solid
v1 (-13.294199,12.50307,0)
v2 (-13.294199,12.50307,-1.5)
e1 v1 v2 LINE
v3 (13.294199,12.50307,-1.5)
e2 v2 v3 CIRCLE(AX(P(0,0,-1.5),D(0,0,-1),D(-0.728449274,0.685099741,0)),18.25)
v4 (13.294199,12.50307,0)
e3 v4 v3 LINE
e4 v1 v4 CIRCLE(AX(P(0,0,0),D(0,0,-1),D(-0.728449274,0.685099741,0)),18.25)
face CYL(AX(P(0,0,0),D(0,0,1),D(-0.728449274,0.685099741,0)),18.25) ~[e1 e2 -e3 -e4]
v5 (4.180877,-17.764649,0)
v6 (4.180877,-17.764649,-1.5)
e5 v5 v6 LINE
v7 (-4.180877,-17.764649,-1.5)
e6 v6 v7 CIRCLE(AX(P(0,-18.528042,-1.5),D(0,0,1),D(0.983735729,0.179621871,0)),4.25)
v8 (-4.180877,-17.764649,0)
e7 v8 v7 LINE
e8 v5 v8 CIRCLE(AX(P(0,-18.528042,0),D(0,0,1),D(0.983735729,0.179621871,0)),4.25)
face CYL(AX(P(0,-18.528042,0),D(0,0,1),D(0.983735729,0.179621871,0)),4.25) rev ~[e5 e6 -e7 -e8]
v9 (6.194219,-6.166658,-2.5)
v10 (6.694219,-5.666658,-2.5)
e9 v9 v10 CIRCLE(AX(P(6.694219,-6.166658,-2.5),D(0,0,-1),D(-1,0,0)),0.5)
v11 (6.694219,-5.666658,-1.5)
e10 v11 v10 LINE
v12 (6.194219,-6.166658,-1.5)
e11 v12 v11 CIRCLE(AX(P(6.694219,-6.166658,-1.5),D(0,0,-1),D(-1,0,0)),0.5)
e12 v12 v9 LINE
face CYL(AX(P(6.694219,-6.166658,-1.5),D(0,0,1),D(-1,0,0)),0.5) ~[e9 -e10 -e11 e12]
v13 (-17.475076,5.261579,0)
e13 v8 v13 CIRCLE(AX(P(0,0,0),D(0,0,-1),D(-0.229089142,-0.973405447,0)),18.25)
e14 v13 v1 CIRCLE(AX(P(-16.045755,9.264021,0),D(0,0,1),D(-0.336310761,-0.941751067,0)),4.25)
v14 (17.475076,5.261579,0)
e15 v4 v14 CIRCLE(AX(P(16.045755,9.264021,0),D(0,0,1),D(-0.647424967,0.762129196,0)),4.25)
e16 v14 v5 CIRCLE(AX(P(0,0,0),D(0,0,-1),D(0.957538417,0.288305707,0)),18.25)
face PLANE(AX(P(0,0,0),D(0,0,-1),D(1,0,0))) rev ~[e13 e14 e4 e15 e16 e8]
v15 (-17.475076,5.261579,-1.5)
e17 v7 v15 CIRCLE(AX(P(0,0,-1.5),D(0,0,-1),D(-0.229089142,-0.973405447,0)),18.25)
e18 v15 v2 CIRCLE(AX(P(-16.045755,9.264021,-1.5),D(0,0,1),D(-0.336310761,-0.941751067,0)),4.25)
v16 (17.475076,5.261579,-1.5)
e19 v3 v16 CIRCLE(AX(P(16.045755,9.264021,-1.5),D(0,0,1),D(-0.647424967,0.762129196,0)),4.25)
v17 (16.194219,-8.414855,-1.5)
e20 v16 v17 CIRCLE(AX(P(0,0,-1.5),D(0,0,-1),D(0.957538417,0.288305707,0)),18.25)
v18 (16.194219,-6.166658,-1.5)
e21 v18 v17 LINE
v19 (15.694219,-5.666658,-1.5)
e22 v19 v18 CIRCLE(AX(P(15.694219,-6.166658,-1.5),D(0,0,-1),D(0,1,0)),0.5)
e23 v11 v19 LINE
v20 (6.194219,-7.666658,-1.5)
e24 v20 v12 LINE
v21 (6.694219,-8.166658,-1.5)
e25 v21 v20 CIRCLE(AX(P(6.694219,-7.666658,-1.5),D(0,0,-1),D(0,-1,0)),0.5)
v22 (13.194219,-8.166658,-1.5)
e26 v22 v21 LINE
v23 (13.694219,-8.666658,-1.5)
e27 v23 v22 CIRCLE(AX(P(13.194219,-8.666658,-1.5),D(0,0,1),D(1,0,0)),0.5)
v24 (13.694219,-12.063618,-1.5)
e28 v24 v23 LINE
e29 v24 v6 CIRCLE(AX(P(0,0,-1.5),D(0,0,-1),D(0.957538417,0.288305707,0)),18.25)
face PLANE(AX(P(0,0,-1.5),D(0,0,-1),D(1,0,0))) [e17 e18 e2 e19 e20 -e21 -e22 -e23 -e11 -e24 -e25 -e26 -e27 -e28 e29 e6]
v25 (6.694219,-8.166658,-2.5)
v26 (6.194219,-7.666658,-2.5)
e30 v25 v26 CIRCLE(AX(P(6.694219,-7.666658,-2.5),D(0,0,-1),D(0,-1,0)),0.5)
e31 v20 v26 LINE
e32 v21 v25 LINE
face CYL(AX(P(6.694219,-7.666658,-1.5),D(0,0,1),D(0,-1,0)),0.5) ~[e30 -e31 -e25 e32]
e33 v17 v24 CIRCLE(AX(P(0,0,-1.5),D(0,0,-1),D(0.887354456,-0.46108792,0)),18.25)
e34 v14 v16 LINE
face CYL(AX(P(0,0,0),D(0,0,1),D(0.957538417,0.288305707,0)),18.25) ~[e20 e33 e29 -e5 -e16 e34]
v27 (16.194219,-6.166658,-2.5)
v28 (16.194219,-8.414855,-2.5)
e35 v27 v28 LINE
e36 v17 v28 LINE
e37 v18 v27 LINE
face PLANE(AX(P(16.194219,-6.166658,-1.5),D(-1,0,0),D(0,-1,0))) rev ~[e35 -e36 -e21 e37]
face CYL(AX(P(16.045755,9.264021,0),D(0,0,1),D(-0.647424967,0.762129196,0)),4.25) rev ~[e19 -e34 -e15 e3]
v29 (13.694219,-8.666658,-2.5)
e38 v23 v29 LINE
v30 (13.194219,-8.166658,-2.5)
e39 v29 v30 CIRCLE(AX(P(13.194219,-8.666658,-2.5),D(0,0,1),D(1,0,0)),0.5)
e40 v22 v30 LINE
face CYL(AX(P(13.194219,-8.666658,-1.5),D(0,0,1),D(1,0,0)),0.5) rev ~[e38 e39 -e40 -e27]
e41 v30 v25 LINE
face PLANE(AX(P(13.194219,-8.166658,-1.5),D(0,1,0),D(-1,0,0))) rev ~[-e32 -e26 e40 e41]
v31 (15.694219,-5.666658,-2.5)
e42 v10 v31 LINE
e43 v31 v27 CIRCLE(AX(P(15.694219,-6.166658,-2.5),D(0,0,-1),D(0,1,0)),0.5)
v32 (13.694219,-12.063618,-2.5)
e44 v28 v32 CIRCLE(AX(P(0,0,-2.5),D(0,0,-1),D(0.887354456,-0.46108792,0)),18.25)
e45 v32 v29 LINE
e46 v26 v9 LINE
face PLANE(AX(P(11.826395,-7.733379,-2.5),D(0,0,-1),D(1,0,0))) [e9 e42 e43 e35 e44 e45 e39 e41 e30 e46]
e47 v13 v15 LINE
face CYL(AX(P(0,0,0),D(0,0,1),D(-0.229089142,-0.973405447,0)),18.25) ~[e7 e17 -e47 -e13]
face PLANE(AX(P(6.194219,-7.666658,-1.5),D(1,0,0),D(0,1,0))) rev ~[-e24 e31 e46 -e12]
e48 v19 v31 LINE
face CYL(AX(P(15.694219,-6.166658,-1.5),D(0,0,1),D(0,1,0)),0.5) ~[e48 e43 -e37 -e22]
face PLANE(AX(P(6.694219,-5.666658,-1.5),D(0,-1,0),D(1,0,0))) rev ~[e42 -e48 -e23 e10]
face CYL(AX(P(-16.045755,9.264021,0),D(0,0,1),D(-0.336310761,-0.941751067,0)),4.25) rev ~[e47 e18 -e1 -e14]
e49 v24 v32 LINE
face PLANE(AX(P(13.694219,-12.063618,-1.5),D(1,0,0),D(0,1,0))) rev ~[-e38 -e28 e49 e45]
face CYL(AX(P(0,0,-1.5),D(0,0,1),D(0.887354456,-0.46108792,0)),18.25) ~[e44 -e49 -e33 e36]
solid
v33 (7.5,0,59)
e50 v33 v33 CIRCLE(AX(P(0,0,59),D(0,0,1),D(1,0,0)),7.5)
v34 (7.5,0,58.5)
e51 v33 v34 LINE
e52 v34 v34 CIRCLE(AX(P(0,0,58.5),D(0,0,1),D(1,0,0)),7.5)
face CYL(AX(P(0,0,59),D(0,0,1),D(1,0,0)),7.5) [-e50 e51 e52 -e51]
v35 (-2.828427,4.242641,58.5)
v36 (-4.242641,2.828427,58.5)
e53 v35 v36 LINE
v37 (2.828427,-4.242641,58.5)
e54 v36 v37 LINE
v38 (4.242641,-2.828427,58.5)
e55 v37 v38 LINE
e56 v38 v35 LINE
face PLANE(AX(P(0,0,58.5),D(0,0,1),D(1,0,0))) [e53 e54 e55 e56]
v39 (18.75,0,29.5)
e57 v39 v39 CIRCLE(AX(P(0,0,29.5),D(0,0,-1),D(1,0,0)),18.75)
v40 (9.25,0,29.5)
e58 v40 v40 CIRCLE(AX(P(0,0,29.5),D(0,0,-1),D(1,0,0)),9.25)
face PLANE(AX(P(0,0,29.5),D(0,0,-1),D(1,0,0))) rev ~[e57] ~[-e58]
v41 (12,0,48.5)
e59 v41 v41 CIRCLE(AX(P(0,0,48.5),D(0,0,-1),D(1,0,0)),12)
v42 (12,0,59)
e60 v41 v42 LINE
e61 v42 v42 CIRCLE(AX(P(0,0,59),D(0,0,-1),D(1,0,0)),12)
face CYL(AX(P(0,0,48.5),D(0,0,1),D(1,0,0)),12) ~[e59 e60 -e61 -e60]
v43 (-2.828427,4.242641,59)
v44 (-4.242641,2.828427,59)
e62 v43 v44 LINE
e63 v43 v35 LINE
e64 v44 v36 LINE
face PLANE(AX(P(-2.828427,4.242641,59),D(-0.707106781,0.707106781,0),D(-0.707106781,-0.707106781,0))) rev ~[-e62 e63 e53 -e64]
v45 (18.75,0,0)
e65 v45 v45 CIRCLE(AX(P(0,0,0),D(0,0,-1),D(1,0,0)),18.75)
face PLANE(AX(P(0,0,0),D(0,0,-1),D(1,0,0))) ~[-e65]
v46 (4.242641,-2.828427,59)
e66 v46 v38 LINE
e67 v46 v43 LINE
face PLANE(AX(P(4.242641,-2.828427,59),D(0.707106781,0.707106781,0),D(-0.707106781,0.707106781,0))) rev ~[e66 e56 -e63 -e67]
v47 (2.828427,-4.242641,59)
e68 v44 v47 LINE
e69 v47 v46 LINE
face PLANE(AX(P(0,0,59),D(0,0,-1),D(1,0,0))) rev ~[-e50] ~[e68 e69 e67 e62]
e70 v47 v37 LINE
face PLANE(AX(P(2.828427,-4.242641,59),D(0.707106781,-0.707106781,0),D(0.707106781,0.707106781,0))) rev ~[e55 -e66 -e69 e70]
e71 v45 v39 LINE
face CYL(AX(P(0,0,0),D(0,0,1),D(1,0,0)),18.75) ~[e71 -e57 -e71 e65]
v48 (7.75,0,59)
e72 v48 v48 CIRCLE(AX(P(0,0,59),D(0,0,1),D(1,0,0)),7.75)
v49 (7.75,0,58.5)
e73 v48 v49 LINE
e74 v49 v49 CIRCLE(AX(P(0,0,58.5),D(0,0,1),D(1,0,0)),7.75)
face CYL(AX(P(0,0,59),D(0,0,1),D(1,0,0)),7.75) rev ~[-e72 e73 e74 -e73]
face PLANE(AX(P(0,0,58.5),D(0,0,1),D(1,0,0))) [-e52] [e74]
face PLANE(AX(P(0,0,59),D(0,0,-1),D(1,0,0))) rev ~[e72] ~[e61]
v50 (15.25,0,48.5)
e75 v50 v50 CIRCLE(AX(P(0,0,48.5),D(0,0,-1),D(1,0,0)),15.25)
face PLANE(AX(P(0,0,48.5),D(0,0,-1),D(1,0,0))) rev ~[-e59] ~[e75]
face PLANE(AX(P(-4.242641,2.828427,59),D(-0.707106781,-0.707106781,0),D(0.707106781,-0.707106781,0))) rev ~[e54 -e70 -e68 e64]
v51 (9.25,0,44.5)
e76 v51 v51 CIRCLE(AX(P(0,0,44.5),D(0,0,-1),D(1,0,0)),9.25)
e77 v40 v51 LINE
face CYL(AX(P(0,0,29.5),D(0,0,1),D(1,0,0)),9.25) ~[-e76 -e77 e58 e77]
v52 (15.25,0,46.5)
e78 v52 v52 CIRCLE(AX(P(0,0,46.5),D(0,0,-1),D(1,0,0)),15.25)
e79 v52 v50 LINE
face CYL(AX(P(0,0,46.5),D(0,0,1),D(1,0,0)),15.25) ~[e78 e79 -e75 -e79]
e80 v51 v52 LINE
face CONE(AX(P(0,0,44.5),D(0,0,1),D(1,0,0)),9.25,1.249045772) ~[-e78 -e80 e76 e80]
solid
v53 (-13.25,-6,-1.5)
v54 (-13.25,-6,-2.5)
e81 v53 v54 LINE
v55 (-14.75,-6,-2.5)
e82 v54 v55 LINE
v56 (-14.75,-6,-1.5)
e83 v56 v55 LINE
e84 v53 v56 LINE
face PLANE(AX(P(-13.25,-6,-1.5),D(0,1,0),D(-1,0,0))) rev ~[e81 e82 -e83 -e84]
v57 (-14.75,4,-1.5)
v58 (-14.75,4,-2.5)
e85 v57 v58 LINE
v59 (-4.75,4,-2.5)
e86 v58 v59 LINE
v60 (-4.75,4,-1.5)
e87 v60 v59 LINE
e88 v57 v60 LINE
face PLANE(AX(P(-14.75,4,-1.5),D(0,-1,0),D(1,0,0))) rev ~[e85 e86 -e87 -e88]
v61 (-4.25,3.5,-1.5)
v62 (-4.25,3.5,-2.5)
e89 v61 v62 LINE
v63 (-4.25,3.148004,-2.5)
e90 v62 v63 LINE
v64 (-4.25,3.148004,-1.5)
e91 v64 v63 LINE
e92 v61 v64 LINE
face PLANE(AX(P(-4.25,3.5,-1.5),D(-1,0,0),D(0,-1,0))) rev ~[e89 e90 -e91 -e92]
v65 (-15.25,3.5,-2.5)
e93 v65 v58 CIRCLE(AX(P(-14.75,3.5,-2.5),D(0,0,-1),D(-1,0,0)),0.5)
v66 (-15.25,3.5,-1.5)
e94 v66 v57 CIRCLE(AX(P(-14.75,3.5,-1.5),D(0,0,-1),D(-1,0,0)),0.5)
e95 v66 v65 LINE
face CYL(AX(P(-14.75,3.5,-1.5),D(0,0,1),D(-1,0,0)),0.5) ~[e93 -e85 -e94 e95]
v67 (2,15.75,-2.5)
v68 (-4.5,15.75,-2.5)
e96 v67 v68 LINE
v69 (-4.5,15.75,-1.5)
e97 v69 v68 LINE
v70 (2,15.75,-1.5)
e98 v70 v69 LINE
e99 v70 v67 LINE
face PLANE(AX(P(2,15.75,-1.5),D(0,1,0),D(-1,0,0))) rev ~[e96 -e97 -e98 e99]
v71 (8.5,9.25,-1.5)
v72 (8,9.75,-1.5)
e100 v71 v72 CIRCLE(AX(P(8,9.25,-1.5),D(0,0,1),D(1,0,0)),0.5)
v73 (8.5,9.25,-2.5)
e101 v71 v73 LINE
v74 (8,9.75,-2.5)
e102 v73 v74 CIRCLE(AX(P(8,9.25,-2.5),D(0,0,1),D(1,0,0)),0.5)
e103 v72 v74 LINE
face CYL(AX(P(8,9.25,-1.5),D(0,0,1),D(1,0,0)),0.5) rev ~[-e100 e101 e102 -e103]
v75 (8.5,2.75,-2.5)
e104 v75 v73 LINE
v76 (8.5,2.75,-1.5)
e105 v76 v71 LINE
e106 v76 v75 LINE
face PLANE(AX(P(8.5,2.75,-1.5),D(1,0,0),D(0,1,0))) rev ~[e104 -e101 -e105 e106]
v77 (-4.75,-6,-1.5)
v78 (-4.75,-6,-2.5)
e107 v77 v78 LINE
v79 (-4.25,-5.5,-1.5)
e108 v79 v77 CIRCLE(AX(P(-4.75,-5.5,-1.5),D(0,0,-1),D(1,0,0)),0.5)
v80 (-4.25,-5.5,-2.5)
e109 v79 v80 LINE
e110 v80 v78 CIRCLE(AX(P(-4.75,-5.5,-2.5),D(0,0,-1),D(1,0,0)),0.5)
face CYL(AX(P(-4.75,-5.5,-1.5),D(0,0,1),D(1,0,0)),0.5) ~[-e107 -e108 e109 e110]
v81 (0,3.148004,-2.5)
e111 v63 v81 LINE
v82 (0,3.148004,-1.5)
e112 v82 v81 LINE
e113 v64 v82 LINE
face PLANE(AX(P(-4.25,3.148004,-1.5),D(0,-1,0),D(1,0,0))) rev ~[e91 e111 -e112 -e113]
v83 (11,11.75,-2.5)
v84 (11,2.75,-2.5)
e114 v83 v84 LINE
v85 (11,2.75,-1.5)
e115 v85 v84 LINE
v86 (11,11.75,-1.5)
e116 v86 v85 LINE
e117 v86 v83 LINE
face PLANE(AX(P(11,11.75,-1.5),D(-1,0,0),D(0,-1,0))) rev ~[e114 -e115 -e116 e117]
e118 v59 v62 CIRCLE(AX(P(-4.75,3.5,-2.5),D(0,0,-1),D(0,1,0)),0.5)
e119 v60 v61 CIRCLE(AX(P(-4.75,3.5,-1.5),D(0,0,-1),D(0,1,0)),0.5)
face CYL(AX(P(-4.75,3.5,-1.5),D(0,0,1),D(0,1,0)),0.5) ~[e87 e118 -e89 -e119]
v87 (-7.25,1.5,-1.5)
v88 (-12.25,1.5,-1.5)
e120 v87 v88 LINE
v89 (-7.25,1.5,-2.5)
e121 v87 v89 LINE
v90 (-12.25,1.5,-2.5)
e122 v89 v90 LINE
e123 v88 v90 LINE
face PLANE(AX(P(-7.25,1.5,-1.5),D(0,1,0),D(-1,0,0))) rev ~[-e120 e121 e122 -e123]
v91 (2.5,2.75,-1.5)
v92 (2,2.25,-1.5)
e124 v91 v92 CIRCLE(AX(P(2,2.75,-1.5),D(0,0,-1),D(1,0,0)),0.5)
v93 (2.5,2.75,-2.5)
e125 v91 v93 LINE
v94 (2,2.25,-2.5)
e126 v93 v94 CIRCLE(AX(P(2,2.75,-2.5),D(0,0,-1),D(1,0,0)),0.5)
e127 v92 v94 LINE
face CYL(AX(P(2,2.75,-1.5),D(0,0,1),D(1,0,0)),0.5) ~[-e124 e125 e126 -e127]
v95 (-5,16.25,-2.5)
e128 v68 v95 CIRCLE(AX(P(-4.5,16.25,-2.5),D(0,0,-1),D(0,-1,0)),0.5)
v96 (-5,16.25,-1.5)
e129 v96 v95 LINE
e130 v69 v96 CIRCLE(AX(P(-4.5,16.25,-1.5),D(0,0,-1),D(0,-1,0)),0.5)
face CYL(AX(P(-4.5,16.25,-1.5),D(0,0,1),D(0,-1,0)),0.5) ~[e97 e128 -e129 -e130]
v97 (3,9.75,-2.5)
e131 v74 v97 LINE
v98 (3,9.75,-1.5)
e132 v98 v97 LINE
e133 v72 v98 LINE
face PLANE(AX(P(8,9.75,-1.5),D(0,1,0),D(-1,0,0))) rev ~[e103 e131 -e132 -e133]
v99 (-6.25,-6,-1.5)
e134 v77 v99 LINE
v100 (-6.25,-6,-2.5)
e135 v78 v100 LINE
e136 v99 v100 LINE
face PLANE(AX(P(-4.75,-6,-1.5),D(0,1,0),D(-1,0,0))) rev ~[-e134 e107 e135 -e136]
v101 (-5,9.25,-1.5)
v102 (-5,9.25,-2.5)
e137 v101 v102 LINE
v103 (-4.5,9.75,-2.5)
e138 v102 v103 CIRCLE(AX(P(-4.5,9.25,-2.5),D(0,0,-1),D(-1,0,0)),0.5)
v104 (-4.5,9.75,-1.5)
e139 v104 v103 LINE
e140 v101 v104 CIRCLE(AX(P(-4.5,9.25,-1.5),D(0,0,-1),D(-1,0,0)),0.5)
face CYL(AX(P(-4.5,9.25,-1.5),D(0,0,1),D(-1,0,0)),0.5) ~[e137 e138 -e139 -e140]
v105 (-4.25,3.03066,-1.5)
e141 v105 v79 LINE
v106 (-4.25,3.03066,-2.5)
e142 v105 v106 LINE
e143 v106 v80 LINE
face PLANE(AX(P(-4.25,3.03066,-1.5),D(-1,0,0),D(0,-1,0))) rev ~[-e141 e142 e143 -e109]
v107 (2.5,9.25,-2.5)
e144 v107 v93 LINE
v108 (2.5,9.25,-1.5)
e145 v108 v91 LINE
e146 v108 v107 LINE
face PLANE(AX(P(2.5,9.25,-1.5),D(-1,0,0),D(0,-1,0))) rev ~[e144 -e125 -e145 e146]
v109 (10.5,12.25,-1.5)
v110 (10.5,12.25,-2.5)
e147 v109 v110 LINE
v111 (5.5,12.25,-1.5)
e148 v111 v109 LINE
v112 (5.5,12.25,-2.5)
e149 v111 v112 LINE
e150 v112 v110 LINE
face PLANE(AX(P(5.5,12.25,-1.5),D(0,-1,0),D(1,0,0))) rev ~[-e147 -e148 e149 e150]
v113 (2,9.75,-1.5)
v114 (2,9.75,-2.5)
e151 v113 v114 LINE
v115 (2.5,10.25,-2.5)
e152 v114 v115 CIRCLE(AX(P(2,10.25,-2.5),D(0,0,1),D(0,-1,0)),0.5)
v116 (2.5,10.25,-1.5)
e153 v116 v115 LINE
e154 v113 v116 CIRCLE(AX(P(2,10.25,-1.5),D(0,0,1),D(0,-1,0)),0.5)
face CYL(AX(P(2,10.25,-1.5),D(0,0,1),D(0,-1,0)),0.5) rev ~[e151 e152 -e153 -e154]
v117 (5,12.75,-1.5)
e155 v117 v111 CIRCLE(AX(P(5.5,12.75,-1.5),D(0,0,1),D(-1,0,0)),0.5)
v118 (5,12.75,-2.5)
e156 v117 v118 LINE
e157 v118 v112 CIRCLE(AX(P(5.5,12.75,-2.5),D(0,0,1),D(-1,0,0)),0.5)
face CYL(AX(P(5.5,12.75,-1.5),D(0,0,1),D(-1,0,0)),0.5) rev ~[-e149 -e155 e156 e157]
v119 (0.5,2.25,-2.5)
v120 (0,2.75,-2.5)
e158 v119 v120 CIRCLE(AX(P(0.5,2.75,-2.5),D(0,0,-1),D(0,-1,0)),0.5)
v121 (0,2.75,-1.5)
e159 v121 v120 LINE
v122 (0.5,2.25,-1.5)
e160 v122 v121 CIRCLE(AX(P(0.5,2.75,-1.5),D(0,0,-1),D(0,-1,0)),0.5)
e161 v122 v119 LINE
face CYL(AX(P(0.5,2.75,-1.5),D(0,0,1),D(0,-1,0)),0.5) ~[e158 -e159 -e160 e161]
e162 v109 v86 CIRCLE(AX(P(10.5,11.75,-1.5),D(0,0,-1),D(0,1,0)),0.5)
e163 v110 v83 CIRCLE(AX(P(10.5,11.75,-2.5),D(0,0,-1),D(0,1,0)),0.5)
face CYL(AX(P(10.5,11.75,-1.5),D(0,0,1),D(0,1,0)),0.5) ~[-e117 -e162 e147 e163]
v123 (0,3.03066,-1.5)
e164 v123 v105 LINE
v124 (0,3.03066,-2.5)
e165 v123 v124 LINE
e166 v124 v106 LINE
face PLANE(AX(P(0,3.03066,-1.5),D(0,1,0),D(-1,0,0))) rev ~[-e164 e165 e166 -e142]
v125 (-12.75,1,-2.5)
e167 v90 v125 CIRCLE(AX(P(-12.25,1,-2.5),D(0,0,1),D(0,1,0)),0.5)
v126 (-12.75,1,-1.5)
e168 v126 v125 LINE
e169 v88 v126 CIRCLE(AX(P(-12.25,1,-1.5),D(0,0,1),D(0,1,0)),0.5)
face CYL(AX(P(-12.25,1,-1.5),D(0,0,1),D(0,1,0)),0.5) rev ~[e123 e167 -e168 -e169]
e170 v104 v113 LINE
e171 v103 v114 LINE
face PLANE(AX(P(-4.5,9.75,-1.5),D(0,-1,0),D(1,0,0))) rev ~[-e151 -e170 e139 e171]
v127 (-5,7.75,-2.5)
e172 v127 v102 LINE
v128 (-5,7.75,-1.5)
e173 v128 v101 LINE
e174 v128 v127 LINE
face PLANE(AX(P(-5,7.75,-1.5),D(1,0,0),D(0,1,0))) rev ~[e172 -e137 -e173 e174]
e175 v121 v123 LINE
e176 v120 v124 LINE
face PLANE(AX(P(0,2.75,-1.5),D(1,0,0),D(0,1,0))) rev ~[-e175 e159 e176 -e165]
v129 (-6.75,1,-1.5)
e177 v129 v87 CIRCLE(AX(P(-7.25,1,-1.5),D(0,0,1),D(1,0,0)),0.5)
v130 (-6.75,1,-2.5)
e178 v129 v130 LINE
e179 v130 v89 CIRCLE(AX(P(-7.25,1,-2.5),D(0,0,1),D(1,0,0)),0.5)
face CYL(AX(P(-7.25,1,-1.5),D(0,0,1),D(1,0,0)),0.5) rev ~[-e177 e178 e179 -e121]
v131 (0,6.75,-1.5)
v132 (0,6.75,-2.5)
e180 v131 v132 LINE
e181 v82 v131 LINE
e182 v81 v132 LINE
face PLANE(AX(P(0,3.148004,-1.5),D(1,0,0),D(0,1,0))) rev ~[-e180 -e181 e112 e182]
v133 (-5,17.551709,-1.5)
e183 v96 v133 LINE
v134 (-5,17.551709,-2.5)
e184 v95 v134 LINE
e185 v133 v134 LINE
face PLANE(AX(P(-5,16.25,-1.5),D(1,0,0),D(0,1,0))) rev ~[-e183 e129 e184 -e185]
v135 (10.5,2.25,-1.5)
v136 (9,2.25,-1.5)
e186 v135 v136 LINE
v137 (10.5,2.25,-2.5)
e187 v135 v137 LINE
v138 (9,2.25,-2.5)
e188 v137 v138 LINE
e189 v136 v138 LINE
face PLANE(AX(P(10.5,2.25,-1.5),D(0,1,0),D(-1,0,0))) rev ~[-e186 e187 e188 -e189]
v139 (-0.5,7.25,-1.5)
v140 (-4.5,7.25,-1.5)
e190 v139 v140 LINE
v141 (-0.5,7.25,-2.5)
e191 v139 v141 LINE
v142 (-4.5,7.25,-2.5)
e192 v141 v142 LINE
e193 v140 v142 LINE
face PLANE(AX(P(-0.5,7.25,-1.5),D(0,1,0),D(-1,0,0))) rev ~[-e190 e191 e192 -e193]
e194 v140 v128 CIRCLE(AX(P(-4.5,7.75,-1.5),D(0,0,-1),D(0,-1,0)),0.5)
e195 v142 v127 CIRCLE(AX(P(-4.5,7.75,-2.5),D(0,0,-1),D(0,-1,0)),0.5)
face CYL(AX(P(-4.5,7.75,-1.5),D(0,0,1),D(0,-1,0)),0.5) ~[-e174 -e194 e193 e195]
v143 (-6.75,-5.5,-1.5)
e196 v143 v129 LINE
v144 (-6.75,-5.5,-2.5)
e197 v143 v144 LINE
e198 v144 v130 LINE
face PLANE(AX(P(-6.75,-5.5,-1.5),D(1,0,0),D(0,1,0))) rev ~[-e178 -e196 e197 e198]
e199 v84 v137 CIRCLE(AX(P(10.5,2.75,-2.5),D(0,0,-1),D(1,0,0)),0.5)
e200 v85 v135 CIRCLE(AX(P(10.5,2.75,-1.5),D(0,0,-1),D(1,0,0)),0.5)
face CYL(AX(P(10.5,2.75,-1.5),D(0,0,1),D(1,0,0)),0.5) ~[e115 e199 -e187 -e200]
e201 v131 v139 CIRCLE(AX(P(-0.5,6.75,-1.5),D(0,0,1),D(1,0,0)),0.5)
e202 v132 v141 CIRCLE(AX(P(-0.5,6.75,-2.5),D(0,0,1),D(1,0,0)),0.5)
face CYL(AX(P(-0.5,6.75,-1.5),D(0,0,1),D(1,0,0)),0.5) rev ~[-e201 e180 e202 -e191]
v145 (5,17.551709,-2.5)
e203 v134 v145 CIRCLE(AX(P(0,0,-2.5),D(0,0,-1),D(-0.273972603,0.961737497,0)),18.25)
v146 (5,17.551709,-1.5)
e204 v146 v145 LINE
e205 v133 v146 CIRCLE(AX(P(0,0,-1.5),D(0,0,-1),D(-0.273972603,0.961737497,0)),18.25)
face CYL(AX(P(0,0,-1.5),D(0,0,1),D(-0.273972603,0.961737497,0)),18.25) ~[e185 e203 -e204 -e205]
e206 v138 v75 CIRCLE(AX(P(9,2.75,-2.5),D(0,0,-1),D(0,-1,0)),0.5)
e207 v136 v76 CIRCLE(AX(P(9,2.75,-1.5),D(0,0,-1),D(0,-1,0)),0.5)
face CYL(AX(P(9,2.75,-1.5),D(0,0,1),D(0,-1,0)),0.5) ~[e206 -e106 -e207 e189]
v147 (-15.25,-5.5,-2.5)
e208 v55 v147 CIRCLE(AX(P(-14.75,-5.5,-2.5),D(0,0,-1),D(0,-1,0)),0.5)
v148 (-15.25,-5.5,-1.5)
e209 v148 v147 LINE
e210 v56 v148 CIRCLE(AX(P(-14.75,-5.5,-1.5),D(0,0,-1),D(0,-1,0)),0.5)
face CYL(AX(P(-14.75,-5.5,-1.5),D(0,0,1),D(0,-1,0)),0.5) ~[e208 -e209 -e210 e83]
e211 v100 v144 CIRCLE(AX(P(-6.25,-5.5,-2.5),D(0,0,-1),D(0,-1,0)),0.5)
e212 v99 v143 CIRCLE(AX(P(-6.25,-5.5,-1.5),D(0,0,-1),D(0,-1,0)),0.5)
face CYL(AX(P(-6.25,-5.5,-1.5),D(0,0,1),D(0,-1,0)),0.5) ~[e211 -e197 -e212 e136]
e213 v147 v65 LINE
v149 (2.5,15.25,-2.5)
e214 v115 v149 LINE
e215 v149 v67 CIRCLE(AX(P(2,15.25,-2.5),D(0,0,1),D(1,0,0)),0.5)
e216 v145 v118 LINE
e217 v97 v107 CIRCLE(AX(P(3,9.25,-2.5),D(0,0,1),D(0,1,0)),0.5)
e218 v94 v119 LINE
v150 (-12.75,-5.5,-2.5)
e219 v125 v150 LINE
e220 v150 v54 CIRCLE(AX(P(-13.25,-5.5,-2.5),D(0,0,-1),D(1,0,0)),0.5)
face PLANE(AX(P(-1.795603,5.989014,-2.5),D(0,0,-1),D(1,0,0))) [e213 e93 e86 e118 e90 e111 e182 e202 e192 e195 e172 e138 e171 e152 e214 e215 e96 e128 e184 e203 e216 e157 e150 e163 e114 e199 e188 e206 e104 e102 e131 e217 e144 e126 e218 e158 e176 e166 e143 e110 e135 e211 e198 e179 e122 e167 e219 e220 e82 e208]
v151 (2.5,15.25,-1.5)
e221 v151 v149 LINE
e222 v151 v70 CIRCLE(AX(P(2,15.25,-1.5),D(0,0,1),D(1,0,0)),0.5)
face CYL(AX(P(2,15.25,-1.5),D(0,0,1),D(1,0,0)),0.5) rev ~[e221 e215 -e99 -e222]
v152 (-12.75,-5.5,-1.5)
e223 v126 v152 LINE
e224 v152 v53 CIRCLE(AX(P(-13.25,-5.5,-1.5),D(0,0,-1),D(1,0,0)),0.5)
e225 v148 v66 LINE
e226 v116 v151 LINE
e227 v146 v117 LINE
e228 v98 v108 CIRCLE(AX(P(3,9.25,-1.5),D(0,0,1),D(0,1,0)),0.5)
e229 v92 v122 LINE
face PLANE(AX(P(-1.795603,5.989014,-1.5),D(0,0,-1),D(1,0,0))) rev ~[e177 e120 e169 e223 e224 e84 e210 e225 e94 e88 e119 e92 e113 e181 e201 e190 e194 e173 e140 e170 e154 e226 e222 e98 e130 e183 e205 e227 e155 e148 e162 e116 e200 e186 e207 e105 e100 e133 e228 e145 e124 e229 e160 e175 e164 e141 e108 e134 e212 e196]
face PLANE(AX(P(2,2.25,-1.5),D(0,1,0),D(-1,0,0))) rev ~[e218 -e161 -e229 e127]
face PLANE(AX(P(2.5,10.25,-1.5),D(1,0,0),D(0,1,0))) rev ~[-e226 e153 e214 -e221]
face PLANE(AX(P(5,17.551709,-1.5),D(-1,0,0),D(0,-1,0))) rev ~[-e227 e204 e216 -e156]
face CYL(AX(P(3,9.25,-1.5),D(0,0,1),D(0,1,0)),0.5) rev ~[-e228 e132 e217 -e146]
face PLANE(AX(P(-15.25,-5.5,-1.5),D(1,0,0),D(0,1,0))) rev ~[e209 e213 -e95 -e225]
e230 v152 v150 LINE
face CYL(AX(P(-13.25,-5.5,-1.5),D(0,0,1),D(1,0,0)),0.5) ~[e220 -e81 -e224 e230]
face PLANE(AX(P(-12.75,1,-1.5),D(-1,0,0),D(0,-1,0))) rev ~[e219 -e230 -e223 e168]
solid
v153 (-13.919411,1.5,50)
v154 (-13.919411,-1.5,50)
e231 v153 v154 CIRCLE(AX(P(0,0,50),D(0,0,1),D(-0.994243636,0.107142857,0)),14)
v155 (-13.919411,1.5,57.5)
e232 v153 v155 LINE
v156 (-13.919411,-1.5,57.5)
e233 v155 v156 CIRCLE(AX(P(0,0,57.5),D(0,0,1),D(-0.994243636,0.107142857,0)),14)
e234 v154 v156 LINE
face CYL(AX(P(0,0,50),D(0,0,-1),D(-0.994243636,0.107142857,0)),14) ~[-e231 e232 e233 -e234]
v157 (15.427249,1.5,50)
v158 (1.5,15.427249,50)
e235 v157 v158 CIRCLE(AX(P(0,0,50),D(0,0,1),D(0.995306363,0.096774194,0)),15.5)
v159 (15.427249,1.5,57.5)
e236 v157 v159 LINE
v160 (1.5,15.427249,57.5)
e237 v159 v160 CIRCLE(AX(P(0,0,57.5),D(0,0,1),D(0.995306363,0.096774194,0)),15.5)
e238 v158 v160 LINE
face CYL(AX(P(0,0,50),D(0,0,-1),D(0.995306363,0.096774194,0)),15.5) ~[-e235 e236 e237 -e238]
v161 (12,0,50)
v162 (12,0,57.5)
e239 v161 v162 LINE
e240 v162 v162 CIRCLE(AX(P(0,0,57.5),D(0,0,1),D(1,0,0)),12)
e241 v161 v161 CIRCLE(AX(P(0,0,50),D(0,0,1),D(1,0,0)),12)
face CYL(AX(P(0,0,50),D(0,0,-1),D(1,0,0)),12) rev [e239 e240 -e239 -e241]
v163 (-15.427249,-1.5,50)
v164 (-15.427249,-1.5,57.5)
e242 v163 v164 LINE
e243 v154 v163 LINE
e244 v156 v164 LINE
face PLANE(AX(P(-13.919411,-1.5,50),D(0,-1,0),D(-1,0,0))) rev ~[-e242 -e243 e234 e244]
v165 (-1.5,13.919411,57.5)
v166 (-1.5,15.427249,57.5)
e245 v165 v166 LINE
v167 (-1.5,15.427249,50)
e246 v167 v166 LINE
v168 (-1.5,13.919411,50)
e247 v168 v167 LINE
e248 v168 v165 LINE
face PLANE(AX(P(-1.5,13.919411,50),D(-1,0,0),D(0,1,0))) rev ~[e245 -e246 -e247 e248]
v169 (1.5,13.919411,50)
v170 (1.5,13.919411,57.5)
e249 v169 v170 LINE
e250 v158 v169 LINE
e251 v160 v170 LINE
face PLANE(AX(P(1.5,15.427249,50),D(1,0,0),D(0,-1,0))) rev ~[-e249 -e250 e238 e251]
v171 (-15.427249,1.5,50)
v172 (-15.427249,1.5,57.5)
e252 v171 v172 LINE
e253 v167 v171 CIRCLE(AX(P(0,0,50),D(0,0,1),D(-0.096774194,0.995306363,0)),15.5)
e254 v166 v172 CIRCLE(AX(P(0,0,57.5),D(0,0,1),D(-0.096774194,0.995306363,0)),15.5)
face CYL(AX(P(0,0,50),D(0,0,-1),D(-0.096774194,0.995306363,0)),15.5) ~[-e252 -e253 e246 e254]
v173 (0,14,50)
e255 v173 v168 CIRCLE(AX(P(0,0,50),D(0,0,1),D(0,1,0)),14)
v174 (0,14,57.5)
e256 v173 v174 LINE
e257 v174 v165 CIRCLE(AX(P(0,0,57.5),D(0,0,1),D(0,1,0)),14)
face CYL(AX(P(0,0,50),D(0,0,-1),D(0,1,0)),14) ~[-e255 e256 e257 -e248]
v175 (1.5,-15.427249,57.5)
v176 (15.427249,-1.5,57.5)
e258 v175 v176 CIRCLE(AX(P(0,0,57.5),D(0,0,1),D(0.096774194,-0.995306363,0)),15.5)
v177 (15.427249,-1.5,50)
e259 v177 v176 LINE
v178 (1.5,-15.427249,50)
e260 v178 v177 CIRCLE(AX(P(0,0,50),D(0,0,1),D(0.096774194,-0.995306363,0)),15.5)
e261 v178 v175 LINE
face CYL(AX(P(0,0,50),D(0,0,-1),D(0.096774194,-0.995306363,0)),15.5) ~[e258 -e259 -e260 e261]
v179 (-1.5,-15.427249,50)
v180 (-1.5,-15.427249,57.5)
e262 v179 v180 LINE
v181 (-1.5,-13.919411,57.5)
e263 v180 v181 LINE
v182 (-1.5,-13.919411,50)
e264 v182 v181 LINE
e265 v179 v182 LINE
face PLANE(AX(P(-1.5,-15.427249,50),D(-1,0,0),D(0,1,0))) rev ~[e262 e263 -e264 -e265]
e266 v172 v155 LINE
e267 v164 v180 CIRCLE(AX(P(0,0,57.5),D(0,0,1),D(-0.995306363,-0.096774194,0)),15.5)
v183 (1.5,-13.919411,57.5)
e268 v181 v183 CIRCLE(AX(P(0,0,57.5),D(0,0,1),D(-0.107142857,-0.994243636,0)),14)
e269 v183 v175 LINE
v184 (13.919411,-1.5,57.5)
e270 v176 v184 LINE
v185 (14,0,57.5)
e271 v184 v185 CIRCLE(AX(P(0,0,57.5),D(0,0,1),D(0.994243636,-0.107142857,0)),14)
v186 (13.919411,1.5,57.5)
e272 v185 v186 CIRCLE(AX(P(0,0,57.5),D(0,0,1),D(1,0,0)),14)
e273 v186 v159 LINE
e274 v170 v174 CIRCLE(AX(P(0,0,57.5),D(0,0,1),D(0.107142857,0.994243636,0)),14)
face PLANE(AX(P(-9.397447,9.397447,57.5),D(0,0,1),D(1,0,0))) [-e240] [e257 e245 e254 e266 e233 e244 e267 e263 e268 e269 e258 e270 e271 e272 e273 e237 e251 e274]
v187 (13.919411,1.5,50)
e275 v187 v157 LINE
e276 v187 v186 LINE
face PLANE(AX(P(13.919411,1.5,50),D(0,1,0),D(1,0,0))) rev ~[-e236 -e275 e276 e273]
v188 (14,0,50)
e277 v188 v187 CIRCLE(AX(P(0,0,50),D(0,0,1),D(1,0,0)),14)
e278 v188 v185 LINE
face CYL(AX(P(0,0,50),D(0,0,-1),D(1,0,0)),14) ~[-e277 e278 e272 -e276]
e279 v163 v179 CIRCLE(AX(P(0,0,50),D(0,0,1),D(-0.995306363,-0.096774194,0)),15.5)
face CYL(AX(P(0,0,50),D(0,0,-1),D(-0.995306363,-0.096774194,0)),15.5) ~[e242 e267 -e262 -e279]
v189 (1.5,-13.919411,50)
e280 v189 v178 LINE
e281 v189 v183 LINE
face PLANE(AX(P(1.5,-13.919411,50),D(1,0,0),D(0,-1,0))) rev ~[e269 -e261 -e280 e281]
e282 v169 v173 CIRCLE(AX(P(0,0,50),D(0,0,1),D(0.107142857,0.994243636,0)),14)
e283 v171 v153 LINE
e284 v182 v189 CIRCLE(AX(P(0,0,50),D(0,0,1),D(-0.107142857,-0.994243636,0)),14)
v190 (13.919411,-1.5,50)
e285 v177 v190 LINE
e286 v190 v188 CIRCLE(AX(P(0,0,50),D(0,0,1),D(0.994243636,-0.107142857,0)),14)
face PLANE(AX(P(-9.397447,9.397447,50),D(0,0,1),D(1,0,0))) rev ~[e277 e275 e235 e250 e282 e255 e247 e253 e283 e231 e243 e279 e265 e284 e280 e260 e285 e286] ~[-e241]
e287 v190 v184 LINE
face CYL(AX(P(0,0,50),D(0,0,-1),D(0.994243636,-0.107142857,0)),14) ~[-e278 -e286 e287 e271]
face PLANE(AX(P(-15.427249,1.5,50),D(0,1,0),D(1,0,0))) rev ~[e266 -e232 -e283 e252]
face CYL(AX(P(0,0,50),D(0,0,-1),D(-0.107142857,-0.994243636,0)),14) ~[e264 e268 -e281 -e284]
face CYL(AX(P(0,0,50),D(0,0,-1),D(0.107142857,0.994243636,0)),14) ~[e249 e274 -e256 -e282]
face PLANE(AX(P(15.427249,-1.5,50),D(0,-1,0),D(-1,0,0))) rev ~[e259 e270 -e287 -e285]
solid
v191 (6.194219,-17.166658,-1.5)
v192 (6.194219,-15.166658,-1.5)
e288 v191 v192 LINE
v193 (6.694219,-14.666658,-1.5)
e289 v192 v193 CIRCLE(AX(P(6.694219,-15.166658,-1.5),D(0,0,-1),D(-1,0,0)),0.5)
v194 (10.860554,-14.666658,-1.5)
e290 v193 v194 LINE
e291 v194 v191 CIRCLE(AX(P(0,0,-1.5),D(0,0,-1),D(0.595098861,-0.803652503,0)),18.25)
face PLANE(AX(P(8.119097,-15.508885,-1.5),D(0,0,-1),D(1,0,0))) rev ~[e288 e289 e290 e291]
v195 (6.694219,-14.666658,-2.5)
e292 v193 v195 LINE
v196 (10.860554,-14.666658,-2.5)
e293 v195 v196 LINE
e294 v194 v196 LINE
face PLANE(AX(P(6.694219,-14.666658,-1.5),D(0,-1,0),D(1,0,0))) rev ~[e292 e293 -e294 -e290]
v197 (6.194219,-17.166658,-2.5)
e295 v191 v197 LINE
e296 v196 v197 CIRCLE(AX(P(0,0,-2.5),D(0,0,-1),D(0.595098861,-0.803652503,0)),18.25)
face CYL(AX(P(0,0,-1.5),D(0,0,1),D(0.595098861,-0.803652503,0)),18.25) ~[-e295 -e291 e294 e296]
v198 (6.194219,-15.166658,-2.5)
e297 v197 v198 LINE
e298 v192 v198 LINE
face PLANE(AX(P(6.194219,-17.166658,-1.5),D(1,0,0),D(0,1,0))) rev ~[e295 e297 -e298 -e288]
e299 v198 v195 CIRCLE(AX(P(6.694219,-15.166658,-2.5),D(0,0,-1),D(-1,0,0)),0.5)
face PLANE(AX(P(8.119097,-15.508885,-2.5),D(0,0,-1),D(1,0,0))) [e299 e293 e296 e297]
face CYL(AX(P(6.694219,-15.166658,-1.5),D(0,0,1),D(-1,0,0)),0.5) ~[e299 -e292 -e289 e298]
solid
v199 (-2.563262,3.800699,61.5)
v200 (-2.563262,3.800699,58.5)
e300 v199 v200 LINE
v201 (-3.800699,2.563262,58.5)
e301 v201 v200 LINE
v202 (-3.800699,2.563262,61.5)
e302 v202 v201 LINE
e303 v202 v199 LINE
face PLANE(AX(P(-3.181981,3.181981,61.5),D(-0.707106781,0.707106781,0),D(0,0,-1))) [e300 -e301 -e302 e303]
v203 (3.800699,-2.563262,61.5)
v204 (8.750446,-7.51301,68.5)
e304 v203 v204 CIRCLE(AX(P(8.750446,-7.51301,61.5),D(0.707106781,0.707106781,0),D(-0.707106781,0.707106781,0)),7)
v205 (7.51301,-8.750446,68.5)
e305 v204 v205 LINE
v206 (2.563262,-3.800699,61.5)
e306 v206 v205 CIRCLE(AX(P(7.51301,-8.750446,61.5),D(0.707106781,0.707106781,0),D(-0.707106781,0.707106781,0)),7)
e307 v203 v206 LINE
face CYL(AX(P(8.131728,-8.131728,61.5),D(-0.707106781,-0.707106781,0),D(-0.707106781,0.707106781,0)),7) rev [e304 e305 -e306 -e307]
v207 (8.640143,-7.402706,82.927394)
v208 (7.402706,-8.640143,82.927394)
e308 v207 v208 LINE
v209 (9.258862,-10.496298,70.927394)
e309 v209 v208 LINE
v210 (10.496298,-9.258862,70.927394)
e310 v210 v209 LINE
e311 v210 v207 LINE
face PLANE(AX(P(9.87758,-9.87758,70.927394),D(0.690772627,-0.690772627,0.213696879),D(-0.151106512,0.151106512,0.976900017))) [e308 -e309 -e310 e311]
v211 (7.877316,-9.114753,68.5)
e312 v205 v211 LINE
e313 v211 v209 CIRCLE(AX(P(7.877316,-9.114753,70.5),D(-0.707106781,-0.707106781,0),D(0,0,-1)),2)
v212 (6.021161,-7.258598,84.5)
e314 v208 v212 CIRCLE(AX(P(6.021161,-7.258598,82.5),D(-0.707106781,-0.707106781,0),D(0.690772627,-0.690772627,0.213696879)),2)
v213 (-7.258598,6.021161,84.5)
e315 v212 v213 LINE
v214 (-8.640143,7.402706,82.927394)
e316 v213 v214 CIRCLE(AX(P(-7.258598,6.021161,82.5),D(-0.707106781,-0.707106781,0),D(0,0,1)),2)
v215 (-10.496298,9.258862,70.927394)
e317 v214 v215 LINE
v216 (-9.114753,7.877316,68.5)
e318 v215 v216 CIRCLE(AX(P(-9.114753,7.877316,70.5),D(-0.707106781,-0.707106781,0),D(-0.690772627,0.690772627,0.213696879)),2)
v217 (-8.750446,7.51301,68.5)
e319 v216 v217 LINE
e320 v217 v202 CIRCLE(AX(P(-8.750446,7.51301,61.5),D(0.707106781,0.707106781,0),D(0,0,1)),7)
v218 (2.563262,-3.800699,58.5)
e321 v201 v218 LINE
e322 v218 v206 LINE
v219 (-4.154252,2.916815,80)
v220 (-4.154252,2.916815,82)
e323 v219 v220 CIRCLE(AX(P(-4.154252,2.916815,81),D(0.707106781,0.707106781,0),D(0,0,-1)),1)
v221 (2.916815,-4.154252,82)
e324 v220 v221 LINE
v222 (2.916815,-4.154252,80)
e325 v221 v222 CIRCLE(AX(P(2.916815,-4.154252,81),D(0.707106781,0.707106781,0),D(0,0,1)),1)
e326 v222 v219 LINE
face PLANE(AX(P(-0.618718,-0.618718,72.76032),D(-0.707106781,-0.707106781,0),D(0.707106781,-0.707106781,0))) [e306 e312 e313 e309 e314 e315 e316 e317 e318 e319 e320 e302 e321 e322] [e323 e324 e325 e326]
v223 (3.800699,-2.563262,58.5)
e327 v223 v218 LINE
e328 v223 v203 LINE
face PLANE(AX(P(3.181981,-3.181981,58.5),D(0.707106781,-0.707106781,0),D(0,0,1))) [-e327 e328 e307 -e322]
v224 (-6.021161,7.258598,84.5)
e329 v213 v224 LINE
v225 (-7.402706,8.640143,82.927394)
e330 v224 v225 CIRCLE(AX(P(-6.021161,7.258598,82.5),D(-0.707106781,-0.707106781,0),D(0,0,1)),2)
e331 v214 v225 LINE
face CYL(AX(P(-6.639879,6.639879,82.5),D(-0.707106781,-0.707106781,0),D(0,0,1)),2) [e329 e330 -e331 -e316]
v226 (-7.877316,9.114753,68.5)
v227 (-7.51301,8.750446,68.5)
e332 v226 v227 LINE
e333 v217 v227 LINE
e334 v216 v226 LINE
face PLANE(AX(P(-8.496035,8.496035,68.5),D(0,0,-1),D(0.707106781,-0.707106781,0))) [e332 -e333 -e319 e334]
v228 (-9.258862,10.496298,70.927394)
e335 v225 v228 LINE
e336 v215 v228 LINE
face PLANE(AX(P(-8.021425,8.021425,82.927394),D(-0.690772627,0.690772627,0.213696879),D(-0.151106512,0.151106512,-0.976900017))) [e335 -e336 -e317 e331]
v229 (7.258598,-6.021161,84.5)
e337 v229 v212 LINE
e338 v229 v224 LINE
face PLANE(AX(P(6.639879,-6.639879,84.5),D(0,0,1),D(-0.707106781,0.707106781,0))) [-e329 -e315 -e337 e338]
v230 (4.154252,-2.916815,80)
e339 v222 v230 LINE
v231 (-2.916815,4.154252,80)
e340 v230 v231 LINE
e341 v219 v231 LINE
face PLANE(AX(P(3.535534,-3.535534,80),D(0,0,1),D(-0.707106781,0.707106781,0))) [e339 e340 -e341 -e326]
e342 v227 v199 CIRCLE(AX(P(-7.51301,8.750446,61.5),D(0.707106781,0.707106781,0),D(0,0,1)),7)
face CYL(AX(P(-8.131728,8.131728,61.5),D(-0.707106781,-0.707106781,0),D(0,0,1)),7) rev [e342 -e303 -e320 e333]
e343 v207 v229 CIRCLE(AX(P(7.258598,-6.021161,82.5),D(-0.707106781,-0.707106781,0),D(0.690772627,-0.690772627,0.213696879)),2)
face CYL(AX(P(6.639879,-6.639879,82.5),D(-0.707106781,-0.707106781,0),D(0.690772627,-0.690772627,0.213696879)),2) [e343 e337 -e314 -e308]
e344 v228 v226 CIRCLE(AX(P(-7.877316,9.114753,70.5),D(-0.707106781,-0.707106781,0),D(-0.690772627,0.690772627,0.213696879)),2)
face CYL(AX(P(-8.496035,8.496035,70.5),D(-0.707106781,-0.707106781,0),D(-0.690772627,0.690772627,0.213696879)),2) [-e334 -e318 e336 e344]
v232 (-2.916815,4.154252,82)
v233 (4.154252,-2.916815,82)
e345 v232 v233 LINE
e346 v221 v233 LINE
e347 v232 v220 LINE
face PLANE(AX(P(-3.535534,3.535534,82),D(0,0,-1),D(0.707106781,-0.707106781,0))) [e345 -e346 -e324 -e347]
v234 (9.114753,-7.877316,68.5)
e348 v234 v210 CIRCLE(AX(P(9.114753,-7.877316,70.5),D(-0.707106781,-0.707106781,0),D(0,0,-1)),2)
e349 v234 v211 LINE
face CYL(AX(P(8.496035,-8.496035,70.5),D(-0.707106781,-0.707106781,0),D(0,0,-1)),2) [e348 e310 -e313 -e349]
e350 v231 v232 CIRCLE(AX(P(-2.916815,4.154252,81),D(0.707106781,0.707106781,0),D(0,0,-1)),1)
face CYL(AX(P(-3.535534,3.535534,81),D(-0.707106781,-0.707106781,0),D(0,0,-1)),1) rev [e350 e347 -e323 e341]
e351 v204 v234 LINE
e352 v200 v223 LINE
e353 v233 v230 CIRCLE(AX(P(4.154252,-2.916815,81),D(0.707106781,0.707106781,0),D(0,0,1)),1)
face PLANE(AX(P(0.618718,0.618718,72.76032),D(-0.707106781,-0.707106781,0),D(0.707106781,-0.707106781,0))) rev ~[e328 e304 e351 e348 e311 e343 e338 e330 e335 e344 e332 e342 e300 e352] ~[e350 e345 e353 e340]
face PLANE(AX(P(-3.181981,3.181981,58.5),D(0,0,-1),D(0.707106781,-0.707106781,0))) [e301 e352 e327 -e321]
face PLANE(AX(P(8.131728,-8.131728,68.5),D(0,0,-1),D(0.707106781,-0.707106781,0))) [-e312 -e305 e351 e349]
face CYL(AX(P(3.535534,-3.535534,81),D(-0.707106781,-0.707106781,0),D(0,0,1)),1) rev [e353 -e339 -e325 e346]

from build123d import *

# Parameters (mm, degrees)
F3_R      = 12
F4_DEPTH  = 7.5
F6_DEPTH  = 0.5
F7_R      = 7.75
F7_R_2    = 7.5
F8_DEPTH  = 0.5
F11_DEPTH = 0.875
F13_DEPTH = 1.5
F16_DEPTH = 1
F17_DEPTH = 1
F18_DEPTH = 1


# Not quite as in the source:
# - a feature names something its author has since deleted; it is built from what else it names


with BuildPart() as f1:
    # F0 (on Front) → F1 (revolve)
    with BuildSketch(Plane.XZ):
        Polygon((0, 59), (0, 0), (18.75, 0), (18.75, 29.5), (9.25, 29.5), (9.25, 44.5), (15.25, 46.5), (15.25, 48.5), (12, 48.5), (12, 59), align=None)
    revolve(axis=Axis((0, 0, 29.5), (0, 0, -1)))

    # F5 (on face) → F6 (cut)
    with BuildSketch(Plane.XY.offset(57.5)):
        with BuildLine():
            ThreePointArc((14.6735305908, 1.5), (14.7308702427, 0.7509739627), (14.75, 0))
            ThreePointArc((14.75, 0), (14.7308702427, -0.7509739627), (14.6735305908, -1.5))
            Line((14.6735305908, -1.5), (15.4272486205, -1.5))
            ThreePointArc((15.4272486205, -1.5), (15.4818014717, -0.750881609), (15.5, 0))
            ThreePointArc((15.5, 0), (15.4818014717, 0.750881609), (15.4272486205, 1.5))
            Line((15.4272486205, 1.5), (14.6735305908, 1.5))
        make_face()
        with BuildLine():
            ThreePointArc((-1.5, 14.6735305908), (0, 14.75), (1.5, 14.6735305908))
            Line((1.5, 14.6735305908), (1.5, 15.4272486205))
            ThreePointArc((1.5, 15.4272486205), (0, 15.5), (-1.5, 15.4272486205))
            Line((-1.5, 15.4272486205), (-1.5, 14.6735305908))
        make_face()
        with BuildLine():
            Line((1.5, -15.4272486205), (1.5, -14.6735305908))
            ThreePointArc((1.5, -14.6735305908), (0, -14.75), (-1.5, -14.6735305908))
            Line((-1.5, -14.6735305908), (-1.5, -15.4272486205))
            ThreePointArc((-1.5, -15.4272486205), (0, -15.5), (1.5, -15.4272486205))
        make_face()
        with BuildLine():
            ThreePointArc((-14.6735305908, -1.5), (-14.75, 0), (-14.6735305908, 1.5))
            Line((-14.6735305908, 1.5), (-15.4272486205, 1.5))
            ThreePointArc((-15.4272486205, 1.5), (-15.5, 0), (-15.4272486205, -1.5))
            Line((-15.4272486205, -1.5), (-14.6735305908, -1.5))
        make_face()
    extrude(amount=-F6_DEPTH, mode=Mode.SUBTRACT)

    # F7 (on face) → F8 (cut)
    with BuildSketch(Plane.XY.offset(59)):
        Circle(F7_R)
        Circle(F7_R_2, mode=Mode.SUBTRACT)
        Polygon((-2.8284271247, 4.2426406871), (-4.2426406871, 2.8284271247), (2.8284271247, -4.2426406871), (4.2426406871, -2.8284271247), (0, 1.4142135624), align=None)
    extrude(amount=-F8_DEPTH, mode=Mode.SUBTRACT)


with BuildPart() as f4:
    # F3 (on offset) → F4 (new body)
    with BuildSketch(Plane.XY.offset(50)):
        with BuildLine():
            Line((-1.5, 13.9194109071), (-1.5, 15.4272486205))
            ThreePointArc((-1.5, 15.4272486205), (-10.9601551084, 10.9601551084), (-15.4272486205, 1.5))
            Line((-15.4272486205, 1.5), (-13.9194109071, 1.5))
            ThreePointArc((-13.9194109071, 1.5), (-9.8994949366, 9.8994949366), (-1.5, 13.9194109071))
        make_face()
        with BuildLine():
            ThreePointArc((-1.5, -13.9194109071), (-9.8994949366, -9.8994949366), (-13.9194109071, -1.5))
            Line((-13.9194109071, -1.5), (-15.4272486205, -1.5))
            ThreePointArc((-15.4272486205, -1.5), (-10.9601551084, -10.9601551084), (-1.5, -15.4272486205))
            Line((-1.5, -15.4272486205), (-1.5, -13.9194109071))
        make_face()
        with BuildLine():
            ThreePointArc((13.9194109071, -1.5), (9.8994949366, -9.8994949366), (1.5, -13.9194109071))
            Line((1.5, -13.9194109071), (1.5, -15.4272486205))
            ThreePointArc((1.5, -15.4272486205), (10.9601551084, -10.9601551084), (15.4272486205, -1.5))
            Line((15.4272486205, -1.5), (13.9194109071, -1.5))
        make_face()
        with BuildLine():
            ThreePointArc((0, 14), (-0.7510816537, 13.979838209), (-1.5, 13.9194109071))
            ThreePointArc((-1.5, 13.9194109071), (-9.8994949366, 9.8994949366), (-13.9194109071, 1.5))
            ThreePointArc((-13.9194109071, 1.5), (-14, 0), (-13.9194109071, -1.5))
            ThreePointArc((-13.9194109071, -1.5), (-9.8994949366, -9.8994949366), (-1.5, -13.9194109071))
            ThreePointArc((-1.5, -13.9194109071), (0, -14), (1.5, -13.9194109071))
            ThreePointArc((1.5, -13.9194109071), (9.8994949366, -9.8994949366), (13.9194109071, -1.5))
            ThreePointArc((13.9194109071, -1.5), (13.979838209, -0.7510816537), (14, 0))
            ThreePointArc((14, 0), (13.979838209, 0.7510816537), (13.9194109071, 1.5))
            ThreePointArc((13.9194109071, 1.5), (9.8994949366, 9.8994949366), (1.5, 13.9194109071))
            ThreePointArc((1.5, 13.9194109071), (0.7510816537, 13.979838209), (0, 14))
        make_face()
        Circle(F3_R, mode=Mode.SUBTRACT)
        with BuildLine():
            Line((1.5, 15.4272486205), (1.5, 13.9194109071))
            ThreePointArc((1.5, 13.9194109071), (9.8994949366, 9.8994949366), (13.9194109071, 1.5))
            Line((13.9194109071, 1.5), (15.4272486205, 1.5))
            ThreePointArc((15.4272486205, 1.5), (10.9601551084, 10.9601551084), (1.5, 15.4272486205))
        make_face()
    extrude(amount=F4_DEPTH)


with BuildPart() as f11:
    # F10 (on offset) → F11 (new body, symmetric)
    with BuildSketch(Plane(origin=(0, 0, 0), x_dir=(0.7071067812, -0.7071067812, 0), z_dir=(-0.7071067812, -0.7071067812, 0))):
        with BuildLine():
            Line((-4.5, 58.5), (0, 58.5))
            Line((0, 58.5), (4.5, 58.5))
            Line((4.5, 58.5), (4.5, 61.5))
            ThreePointArc((4.5, 61.5), (6.5502525317, 66.4497474683), (11.5, 68.5))
            Line((11.5, 68.5), (12.0152075807, 68.5))
            ThreePointArc((12.0152075807, 68.5), (13.5732171306, 69.2459640187), (13.9690076155, 70.9273937576))
            Line((13.9690076155, 70.9273937576), (11.3440076155, 82.9273937576))
            ThreePointArc((11.3440076155, 82.9273937576), (10.644243562, 84.0580095499), (9.3902075807, 84.5))
            Line((9.3902075807, 84.5), (0, 84.5))
            Line((0, 84.5), (-9.3902075807, 84.5))
            ThreePointArc((-9.3902075807, 84.5), (-10.644243562, 84.0580095499), (-11.3440076155, 82.9273937576))
            Line((-11.3440076155, 82.9273937576), (-13.9690076155, 70.9273937576))
            ThreePointArc((-13.9690076155, 70.9273937576), (-13.5732171306, 69.2459640187), (-12.0152075807, 68.5))
            Line((-12.0152075807, 68.5), (-11.5, 68.5))
            ThreePointArc((-11.5, 68.5), (-6.5502525317, 66.4497474683), (-4.5, 61.5))
            Line((-4.5, 61.5), (-4.5, 58.5))
        make_face()
        with BuildLine():
            Line((-5, 82), (0, 82))
            Line((0, 82), (5, 82))
            ThreePointArc((5, 82), (6, 81), (5, 80))
            Line((5, 80), (0, 80))
            Line((0, 80), (-5, 80))
            ThreePointArc((-5, 80), (-6, 81), (-5, 82))
        make_face(mode=Mode.SUBTRACT)
    extrude(amount=F11_DEPTH, both=True)


with BuildPart() as f13:
    # F12 (on face) → F13 (new body)
    with BuildSketch(Plane(origin=(0, 0, 0), x_dir=(1, 0, 0), z_dir=(0, 0, -1))):
        with BuildLine():
            ThreePointArc((4.1808768461, 17.7646494139), (0, 14.2780423647), (-4.1808768461, 17.7646494139))
            ThreePointArc((-4.1808768461, 17.7646494139), (-15.8049636191, 9.125), (-17.4750761048, -5.2615791481))
            ThreePointArc((-17.4750761048, -5.2615791481), (-12.3651474041, -7.1390211823), (-13.2941992587, -12.5030702658))
            ThreePointArc((-13.2941992587, -12.5030702658), (0, -18.25), (13.2941992587, -12.5030702658))
            ThreePointArc((13.2941992587, -12.5030702658), (12.3651474041, -7.1390211823), (17.4750761048, -5.2615791481))
            ThreePointArc((17.4750761048, -5.2615791481), (15.8049636191, 9.125), (4.1808768461, 17.7646494139))
        make_face()
    extrude(amount=F13_DEPTH)

    # F15 (on face) → F18 (join)
    with BuildSketch(Plane(origin=(0, 0, -1.5), x_dir=(1, 0, 0), z_dir=(0, 0, -1))):
        with BuildLine():
            Line((16.1942188134, 6.1666581865), (16.1942188134, 8.4148545455))
            ThreePointArc((16.1942188134, 8.4148545455), (15.0551666883, 10.315253559), (13.6942188134, 12.0636176618))
            Line((13.6942188134, 12.0636176618), (13.6942188134, 8.6666581865))
            ThreePointArc((13.6942188134, 8.6666581865), (13.547772204, 8.3131047959), (13.1942188134, 8.1666581865))
            Line((13.1942188134, 8.1666581865), (6.6942188134, 8.1666581865))
            ThreePointArc((6.6942188134, 8.1666581865), (6.3406654228, 8.0202115771), (6.1942188134, 7.6666581865))
            Line((6.1942188134, 7.6666581865), (6.1942188134, 6.1666581865))
            ThreePointArc((6.1942188134, 6.1666581865), (6.3406654228, 5.8131047959), (6.6942188134, 5.6666581865))
            Line((6.6942188134, 5.6666581865), (15.6942188134, 5.6666581865))
            ThreePointArc((15.6942188134, 5.6666581865), (16.047772204, 5.8131047959), (16.1942188134, 6.1666581865))
        make_face()
    extrude(amount=F18_DEPTH)


with BuildPart() as f16:
    # F15 (on face) → F16 (new body)
    with BuildSketch(Plane(origin=(0, 0, -1.5), x_dir=(1, 0, 0), z_dir=(0, 0, -1))):
        with BuildLine():
            Line((-5, -16.25), (-5, -17.5517093185))
            ThreePointArc((-5, -17.5517093185), (0, -18.25), (5, -17.5517093185))
            Line((5, -17.5517093185), (5, -12.75))
            ThreePointArc((5, -12.75), (5.1464466094, -12.3964466094), (5.5, -12.25))
            Line((5.5, -12.25), (10.5, -12.25))
            ThreePointArc((10.5, -12.25), (10.8535533906, -12.1035533906), (11, -11.75))
            Line((11, -11.75), (11, -2.75))
            ThreePointArc((11, -2.75), (10.8535533906, -2.3964466094), (10.5, -2.25))
            Line((10.5, -2.25), (9, -2.25))
            ThreePointArc((9, -2.25), (8.6464466094, -2.3964466094), (8.5, -2.75))
            Line((8.5, -2.75), (8.5, -9.25))
            ThreePointArc((8.5, -9.25), (8.3535533906, -9.6035533906), (8, -9.75))
            Line((8, -9.75), (3, -9.75))
            ThreePointArc((3, -9.75), (2.6464466094, -9.6035533906), (2.5, -9.25))
            Line((2.5, -9.25), (2.5, -2.75))
            ThreePointArc((2.5, -2.75), (2.3535533906, -2.3964466094), (2, -2.25))
            Line((2, -2.25), (0.5, -2.25))
            ThreePointArc((0.5, -2.25), (0.1464466094, -2.3964466094), (0, -2.75))
            Line((0, -2.75), (0, -3.0306600966))
            Line((0, -3.0306600966), (-4.25, -3.0306600966))
            Line((-4.25, -3.0306600966), (-4.25, 5.5))
            ThreePointArc((-4.25, 5.5), (-4.3964466094, 5.8535533906), (-4.75, 6))
            Line((-4.75, 6), (-6.25, 6))
            ThreePointArc((-6.25, 6), (-6.6035533906, 5.8535533906), (-6.75, 5.5))
            Line((-6.75, 5.5), (-6.75, -1))
            ThreePointArc((-6.75, -1), (-6.8964466094, -1.3535533906), (-7.25, -1.5))
            Line((-7.25, -1.5), (-12.25, -1.5))
            ThreePointArc((-12.25, -1.5), (-12.6035533906, -1.3535533906), (-12.75, -1))
            Line((-12.75, -1), (-12.75, 5.5))
            ThreePointArc((-12.75, 5.5), (-12.8964466094, 5.8535533906), (-13.25, 6))
            Line((-13.25, 6), (-14.75, 6))
            ThreePointArc((-14.75, 6), (-15.1035533906, 5.8535533906), (-15.25, 5.5))
            Line((-15.25, 5.5), (-15.25, -3.5))
            ThreePointArc((-15.25, -3.5), (-15.1035533906, -3.8535533906), (-14.75, -4))
            Line((-14.75, -4), (-4.75, -4))
            ThreePointArc((-4.75, -4), (-4.3964466094, -3.8535533906), (-4.25, -3.5))
            Line((-4.25, -3.5), (-4.25, -3.1480044127))
            Line((-4.25, -3.1480044127), (0, -3.1480044127))
            Line((0, -3.1480044127), (0, -6.75))
            ThreePointArc((0, -6.75), (-0.1464466094, -7.1035533906), (-0.5, -7.25))
            Line((-0.5, -7.25), (-4.5, -7.25))
            ThreePointArc((-4.5, -7.25), (-4.8535533906, -7.3964466094), (-5, -7.75))
            Line((-5, -7.75), (-5, -9.25))
            ThreePointArc((-5, -9.25), (-4.8535533906, -9.6035533906), (-4.5, -9.75))
            Line((-4.5, -9.75), (2, -9.75))
            ThreePointArc((2, -9.75), (2.3535533906, -9.8964466094), (2.5, -10.25))
            Line((2.5, -10.25), (2.5, -15.25))
            ThreePointArc((2.5, -15.25), (2.3535533906, -15.6035533906), (2, -15.75))
            Line((2, -15.75), (0, -15.75))
            Line((0, -15.75), (-4.5, -15.75))
            ThreePointArc((-4.5, -15.75), (-4.8535533906, -15.8964466094), (-5, -16.25))
        make_face()
    extrude(amount=F16_DEPTH)


with BuildPart() as f17:
    # F15 (on face) → F17 (new body)
    with BuildSketch(Plane(origin=(0, 0, -1.5), x_dir=(1, 0, 0), z_dir=(0, 0, -1))):
        with BuildLine():
            ThreePointArc((10.8605542051, 14.6666581865), (8.6185161529, 16.0867547791), (6.1942188134, 17.1666581865))
            Line((6.1942188134, 17.1666581865), (6.1942188134, 15.1666581865))
            ThreePointArc((6.1942188134, 15.1666581865), (6.3406654228, 14.8131047959), (6.6942188134, 14.6666581865))
            Line((6.6942188134, 14.6666581865), (10.8605542051, 14.6666581865))
        make_face()
    extrude(amount=F17_DEPTH)


solid = Compound([f1.part, f4.part, f11.part, f13.part, f16.part, f17.part])
